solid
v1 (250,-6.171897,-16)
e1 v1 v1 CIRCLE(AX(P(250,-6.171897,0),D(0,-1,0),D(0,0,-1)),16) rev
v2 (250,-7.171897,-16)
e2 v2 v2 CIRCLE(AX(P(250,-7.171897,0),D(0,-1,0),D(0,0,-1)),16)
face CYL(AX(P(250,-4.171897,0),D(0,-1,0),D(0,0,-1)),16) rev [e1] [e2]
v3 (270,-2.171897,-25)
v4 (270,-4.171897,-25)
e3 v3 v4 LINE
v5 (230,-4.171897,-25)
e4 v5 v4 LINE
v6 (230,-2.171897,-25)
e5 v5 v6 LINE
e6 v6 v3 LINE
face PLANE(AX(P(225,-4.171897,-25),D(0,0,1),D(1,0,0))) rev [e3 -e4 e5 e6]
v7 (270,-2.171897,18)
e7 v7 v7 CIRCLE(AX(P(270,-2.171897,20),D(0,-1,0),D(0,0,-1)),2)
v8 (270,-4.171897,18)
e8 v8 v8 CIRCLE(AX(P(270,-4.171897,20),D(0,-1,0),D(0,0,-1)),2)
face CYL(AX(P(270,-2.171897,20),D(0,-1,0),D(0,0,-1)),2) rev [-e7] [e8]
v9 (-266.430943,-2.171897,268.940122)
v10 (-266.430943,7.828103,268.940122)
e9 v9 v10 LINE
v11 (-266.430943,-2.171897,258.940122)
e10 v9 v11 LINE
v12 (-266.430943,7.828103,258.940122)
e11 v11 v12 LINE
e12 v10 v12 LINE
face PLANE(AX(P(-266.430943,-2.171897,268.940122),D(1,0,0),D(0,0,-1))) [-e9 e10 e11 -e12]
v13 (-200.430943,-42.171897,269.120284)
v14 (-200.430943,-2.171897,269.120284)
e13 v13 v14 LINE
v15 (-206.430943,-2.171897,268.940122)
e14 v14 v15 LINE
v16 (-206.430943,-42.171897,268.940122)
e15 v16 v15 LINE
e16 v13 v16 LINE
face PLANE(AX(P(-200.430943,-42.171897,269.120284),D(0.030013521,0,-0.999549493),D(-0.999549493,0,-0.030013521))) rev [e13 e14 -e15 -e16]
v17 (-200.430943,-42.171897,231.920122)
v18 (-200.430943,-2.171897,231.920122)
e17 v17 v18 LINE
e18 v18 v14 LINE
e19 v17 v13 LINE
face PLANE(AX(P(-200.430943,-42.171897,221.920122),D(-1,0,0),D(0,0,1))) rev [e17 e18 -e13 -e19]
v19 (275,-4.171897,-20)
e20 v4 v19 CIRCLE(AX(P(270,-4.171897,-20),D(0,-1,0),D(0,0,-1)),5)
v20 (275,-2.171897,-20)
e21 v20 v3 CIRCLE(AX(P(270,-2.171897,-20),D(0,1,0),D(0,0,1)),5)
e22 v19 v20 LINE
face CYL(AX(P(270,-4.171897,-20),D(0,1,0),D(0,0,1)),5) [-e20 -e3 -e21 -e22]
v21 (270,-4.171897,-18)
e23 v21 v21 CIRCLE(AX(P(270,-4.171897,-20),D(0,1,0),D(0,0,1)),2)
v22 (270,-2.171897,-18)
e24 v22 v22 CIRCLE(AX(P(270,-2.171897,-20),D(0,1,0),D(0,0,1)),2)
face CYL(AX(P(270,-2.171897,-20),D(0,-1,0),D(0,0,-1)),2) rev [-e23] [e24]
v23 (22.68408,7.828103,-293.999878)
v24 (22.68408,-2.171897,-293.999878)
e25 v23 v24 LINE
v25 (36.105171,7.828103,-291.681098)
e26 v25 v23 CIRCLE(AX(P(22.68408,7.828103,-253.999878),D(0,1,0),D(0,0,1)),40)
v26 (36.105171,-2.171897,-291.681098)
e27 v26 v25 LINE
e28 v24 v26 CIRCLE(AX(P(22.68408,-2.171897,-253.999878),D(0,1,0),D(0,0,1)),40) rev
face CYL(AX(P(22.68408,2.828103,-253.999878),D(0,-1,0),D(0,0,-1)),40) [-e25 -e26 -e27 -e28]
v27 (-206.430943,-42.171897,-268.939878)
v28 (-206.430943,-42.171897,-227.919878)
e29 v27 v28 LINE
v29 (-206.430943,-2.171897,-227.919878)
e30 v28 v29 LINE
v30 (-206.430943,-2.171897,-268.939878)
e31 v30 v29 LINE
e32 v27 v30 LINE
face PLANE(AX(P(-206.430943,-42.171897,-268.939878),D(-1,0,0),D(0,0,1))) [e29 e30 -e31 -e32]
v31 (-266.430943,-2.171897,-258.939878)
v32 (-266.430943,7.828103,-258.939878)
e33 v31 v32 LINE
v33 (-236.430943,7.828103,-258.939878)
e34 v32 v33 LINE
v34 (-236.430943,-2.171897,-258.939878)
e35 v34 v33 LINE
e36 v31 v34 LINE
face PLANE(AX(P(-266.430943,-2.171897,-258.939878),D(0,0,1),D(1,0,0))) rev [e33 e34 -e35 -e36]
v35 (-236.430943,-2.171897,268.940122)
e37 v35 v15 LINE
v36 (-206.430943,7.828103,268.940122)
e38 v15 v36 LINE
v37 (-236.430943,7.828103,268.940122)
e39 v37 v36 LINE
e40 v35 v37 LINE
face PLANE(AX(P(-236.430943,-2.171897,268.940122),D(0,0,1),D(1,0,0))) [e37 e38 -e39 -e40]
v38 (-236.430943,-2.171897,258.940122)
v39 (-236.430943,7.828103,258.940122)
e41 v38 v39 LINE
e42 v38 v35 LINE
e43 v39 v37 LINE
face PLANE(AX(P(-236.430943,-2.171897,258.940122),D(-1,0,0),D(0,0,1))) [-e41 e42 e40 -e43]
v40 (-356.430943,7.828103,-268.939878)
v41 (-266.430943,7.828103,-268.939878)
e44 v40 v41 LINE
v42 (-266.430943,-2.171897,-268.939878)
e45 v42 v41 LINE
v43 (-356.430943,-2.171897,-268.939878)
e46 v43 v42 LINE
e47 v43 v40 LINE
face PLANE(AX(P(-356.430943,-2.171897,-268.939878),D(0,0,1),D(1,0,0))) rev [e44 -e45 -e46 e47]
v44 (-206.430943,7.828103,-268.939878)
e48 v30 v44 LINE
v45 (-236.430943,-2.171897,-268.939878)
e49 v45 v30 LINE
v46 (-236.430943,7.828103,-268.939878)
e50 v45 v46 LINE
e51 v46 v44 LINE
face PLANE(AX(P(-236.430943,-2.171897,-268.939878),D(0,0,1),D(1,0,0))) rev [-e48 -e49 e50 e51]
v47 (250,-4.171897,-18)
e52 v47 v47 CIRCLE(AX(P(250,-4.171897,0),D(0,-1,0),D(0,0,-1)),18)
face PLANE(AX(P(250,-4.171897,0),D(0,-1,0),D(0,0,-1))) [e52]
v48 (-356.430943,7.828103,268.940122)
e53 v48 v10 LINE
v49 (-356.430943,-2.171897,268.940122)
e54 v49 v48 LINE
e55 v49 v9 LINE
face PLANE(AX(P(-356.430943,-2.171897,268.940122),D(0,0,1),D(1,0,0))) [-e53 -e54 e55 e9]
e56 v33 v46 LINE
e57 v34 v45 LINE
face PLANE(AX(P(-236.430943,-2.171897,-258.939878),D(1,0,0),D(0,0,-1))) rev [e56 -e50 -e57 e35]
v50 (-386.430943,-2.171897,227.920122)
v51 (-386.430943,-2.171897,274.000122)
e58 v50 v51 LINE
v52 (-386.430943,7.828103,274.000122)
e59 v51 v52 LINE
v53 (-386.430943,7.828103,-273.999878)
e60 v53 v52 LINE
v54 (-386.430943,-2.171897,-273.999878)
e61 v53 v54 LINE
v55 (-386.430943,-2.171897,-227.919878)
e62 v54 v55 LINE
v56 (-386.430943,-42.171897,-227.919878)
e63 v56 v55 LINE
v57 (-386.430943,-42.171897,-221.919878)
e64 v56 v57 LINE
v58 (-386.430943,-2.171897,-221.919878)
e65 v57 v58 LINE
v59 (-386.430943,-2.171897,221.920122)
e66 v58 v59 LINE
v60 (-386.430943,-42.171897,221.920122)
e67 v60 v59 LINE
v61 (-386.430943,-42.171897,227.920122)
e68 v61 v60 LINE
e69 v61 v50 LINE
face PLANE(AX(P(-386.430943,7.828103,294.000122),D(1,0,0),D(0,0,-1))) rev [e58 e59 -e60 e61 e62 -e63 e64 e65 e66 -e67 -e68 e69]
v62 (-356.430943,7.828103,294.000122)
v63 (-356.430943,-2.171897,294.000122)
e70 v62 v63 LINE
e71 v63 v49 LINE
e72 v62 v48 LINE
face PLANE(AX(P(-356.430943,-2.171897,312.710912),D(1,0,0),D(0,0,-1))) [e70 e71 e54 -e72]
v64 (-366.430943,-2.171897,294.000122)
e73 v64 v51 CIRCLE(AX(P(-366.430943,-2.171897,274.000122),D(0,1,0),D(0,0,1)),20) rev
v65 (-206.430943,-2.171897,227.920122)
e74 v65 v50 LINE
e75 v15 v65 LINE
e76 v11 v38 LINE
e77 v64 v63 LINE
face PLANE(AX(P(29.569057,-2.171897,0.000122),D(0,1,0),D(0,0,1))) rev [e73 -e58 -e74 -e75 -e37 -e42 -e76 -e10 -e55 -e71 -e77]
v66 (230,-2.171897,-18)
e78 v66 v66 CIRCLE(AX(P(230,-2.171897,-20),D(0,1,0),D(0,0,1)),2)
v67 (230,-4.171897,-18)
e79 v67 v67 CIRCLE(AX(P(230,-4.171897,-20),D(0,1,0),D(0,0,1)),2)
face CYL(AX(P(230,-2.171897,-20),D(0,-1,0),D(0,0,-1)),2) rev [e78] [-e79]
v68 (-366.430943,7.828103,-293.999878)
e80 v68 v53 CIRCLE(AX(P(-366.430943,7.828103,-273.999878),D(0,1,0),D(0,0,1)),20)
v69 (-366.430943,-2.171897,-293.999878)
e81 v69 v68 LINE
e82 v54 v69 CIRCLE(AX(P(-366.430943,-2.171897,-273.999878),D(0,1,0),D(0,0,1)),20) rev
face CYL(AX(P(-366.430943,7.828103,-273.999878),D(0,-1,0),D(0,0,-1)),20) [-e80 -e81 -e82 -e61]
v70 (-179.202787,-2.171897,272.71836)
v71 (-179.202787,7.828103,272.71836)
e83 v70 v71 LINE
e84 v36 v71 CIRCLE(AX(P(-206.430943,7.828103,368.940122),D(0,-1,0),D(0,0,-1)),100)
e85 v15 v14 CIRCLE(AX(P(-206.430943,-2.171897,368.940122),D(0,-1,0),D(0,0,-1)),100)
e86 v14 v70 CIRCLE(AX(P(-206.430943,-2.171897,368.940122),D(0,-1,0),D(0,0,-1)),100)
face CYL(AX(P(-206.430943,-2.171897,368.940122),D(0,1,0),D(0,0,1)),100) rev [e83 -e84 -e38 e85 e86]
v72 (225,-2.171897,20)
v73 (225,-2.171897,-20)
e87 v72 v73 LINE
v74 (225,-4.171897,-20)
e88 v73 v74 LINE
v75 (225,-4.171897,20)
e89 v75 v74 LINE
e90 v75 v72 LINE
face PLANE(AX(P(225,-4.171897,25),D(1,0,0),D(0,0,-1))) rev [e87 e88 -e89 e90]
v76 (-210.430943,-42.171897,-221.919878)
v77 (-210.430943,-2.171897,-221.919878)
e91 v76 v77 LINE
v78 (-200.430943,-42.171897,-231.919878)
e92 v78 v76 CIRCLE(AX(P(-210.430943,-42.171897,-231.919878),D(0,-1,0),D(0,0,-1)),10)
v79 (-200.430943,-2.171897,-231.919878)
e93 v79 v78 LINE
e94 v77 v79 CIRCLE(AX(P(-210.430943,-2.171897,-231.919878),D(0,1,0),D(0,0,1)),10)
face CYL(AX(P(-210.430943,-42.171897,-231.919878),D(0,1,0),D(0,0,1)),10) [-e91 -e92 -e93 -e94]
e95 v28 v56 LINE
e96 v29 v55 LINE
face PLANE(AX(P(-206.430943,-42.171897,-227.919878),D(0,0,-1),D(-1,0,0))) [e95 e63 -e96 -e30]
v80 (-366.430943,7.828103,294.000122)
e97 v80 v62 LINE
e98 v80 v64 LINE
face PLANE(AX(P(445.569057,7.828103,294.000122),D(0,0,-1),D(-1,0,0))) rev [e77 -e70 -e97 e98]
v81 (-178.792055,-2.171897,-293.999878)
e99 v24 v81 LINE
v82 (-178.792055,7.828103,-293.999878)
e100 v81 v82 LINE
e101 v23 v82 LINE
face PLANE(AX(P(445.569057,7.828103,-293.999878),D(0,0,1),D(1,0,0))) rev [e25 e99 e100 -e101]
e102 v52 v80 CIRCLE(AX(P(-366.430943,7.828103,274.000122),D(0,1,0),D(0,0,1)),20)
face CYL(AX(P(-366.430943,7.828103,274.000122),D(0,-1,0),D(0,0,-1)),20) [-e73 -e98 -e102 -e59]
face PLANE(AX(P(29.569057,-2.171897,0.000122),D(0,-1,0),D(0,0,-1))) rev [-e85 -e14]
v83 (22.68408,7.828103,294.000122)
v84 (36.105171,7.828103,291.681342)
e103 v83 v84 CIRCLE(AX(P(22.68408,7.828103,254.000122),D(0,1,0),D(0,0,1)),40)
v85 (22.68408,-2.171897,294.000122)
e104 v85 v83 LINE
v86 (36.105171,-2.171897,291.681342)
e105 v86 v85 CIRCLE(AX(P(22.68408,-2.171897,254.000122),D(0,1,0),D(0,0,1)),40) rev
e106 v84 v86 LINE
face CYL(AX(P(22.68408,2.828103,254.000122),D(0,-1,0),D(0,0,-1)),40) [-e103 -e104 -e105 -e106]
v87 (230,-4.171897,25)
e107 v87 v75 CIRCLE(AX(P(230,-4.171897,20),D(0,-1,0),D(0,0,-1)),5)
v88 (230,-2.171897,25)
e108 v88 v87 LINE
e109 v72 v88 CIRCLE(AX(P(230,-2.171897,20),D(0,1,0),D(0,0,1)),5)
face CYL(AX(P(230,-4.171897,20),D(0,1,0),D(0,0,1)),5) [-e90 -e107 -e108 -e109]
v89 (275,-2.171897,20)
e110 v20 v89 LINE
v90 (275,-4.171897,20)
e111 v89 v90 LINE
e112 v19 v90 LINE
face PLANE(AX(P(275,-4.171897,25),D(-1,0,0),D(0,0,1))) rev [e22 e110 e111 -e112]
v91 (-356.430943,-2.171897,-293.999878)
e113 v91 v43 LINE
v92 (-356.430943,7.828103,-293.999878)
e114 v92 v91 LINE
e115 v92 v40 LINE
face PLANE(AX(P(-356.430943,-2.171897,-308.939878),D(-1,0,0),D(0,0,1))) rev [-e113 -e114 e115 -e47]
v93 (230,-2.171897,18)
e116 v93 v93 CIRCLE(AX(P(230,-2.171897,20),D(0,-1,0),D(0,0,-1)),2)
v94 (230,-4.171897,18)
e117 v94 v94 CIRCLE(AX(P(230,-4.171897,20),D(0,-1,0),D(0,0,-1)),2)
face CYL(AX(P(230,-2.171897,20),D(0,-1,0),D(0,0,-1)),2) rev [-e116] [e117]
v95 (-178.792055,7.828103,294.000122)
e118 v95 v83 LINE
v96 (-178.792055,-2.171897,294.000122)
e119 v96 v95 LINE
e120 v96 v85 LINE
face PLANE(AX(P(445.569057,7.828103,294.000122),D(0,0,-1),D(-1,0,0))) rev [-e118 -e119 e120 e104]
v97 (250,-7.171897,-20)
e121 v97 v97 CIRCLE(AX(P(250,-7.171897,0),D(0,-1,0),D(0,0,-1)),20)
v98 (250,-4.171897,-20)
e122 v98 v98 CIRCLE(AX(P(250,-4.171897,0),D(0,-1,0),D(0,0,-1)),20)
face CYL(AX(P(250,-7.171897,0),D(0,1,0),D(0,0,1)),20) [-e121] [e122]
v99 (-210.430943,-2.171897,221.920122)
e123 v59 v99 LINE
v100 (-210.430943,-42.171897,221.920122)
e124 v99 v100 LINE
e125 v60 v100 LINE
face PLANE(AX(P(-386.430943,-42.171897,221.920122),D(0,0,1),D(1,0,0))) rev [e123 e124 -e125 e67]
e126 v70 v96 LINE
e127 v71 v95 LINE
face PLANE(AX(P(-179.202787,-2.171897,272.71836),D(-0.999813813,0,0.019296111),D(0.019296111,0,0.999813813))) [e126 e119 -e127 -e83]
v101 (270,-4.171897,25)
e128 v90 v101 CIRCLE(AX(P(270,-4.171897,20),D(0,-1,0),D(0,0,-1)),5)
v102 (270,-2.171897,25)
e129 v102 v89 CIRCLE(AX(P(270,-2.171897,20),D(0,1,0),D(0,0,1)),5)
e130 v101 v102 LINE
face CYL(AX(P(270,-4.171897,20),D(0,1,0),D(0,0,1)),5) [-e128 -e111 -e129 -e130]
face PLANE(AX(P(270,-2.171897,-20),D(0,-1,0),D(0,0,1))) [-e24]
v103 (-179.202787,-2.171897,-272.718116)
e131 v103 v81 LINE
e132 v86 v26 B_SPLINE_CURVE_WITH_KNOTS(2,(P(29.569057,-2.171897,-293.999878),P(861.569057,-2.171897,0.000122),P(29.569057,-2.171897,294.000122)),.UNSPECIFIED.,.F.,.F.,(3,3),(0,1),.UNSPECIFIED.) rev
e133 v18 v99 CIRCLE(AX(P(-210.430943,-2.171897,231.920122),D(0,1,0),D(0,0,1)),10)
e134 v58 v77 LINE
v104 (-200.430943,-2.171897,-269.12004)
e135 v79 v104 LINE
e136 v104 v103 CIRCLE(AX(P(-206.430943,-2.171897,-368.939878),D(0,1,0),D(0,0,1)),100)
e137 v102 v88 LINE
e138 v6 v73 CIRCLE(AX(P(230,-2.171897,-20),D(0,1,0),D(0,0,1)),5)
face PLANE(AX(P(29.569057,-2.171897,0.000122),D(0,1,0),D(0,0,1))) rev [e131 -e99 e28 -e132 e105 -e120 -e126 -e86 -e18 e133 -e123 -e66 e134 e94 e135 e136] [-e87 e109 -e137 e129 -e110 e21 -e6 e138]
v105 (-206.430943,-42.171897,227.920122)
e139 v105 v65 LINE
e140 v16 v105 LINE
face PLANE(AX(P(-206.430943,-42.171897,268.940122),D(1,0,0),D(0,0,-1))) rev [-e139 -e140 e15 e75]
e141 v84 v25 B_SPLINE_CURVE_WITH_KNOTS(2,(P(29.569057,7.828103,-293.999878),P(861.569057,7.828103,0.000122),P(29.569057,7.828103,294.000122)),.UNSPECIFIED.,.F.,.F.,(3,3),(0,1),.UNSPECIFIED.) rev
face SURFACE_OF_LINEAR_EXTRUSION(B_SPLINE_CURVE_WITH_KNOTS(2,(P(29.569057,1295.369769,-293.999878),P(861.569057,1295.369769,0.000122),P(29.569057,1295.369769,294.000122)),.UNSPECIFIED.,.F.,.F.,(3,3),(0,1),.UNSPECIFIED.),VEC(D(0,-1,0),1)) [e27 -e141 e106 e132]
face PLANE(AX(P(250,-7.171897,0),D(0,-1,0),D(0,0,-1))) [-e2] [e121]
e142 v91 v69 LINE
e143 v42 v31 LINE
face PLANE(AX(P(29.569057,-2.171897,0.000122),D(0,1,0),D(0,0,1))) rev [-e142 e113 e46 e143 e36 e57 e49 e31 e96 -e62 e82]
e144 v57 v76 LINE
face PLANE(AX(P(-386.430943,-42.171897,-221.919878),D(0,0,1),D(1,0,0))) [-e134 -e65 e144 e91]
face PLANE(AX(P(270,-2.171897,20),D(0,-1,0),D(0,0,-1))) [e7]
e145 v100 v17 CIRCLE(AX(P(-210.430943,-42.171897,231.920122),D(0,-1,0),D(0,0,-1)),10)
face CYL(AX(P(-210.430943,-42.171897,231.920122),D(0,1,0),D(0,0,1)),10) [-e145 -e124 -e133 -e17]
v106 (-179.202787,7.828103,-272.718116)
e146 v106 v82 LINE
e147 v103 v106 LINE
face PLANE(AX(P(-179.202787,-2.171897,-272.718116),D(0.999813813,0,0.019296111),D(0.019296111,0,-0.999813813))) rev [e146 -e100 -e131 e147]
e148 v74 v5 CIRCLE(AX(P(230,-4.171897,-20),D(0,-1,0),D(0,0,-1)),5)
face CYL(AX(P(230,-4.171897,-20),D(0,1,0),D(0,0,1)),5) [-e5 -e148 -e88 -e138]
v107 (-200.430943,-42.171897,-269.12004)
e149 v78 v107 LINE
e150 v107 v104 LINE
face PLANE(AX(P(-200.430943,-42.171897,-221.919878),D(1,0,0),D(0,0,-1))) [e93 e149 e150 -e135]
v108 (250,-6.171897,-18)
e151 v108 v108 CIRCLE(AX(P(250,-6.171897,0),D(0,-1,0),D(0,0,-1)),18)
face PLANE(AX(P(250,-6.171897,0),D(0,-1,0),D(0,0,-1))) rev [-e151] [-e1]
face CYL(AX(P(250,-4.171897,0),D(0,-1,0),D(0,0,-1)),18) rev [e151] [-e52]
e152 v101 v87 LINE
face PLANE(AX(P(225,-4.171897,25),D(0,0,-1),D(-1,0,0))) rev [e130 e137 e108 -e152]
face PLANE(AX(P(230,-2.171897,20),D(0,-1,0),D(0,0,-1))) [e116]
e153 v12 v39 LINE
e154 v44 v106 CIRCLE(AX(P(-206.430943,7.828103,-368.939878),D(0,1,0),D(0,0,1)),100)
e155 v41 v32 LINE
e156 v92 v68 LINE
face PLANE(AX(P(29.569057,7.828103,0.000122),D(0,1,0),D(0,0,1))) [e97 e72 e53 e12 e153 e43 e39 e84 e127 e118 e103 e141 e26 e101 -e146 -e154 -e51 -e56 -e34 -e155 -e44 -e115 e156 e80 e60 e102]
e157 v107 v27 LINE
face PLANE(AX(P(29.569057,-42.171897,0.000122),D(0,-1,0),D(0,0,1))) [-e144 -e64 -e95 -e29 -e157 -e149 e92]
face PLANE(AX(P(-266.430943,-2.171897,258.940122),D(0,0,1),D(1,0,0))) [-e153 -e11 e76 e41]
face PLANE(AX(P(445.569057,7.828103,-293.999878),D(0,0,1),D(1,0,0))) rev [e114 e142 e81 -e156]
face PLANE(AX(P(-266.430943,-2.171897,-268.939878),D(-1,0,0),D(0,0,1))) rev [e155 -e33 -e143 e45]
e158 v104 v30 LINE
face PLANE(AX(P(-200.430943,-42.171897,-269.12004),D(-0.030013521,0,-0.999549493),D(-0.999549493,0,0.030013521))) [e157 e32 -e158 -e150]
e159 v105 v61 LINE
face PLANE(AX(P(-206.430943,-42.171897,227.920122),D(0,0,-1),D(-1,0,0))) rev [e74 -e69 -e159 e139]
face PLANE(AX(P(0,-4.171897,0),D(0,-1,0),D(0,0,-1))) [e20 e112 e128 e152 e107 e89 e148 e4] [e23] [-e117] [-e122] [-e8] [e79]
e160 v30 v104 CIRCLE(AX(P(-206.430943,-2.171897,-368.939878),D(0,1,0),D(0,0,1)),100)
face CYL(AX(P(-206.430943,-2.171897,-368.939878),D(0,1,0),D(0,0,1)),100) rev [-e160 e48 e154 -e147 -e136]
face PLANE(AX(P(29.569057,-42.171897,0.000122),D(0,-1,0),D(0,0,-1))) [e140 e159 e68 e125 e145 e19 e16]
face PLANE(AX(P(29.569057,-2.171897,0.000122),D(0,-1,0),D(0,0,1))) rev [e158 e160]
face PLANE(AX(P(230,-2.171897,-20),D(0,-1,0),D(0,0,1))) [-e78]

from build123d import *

# Parameters (mm, degrees)
CROQUIS1_W                 = 416
CROQUIS1_H                 = 294
SALIENTE_EXTRUIR1_DEPTH    = 5
CORTAR_EXTRUIR1_DEPTH      = 255.750858684
REDONDEO1_R                = 10
SALIENTE_EXTRUIR3_DEPTH    = 20
REDONDEO2_R                = 5
REDONDEO2_OF_SIMETR_A3_R   = 5
CORTAR_EXTRUIR5_DEPTH      = 256.925770488
CORTAR_EXTRUIR5_DEPTH_BACK = 256.925770488
REDONDEO4_R                = 20
ESCALA1_START              = -20
ESCALA1_DEPTH              = 17.828103166
ESCALA1_START_2            = -2.171896834
ESCALA1_2_DEPTH            = 10
ESCALA1_START_3            = -42.171896834
ESCALA1_3_DEPTH            = 40
CROQUIS9_W                 = 50
CROQUIS9_H                 = 50
SALIENTE_EXTRUIR4_DEPTH    = 2
REDONDEO5_R                = 5
CROQUIS10_R                = 2
CORTAR_EXTRUIR7_DEPTH      = 2
CROQUIS11_R                = 20
SALIENTE_EXTRUIR5_DEPTH    = 3
CROQUIS12_R                = 16
CORTAR_EXTRUIR8_DEPTH      = 3
CROQUIS13_R                = 20
SALIENTE_EXTRUIR6_DEPTH    = 2
CROQUIS14_R                = 18
CORTAR_EXTRUIR9_DEPTH      = 2


# Read off the part's stored shape, not the designer's step: Escala1
with BuildPart() as part:
    # Croquis1 → Saliente-Extruir1 (new body)
    with BuildSketch(Plane(origin=(0, 0, 0), x_dir=(1, 0, 0), z_dir=(0, 1, 0))):
        Rectangle(CROQUIS1_W, CROQUIS1_H)
    extrude(amount=SALIENTE_EXTRUIR1_DEPTH)

    # Croquis3 → Cortar-Extruir1 (cut, through all)
    with BuildSketch(Plane(origin=(0, 5, 0), x_dir=(1, 0, 0), z_dir=(0, 1, 0))):
        with BuildLine():
            Line((-193, 154.47), (-193, 134.47))
            Line((-193, 134.47), (-148, 134.47))
            Line((-148, 134.47), (-148, 129.47))
            Line((-148, 129.47), (-133, 129.47))
            Line((-133, 129.47), (-133, 134.47))
            Line((-133, 134.47), (-118, 134.47))
            ThreePointArc((-118, 134.47), (-111.127739024, 134.944531511), (-104.385922224, 136.359118837))
            Line((-104.385922224, 136.359118837), (-104, 156.355395091))
            Line((-104, 156.355395091), (-193, 156.355395091))
            Line((-193, 156.355395091), (-193, 154.47))
        make_face()
    cortar_extruir1 = extrude(amount=-CORTAR_EXTRUIR1_DEPTH, mode=Mode.SUBTRACT)

    # Simetría1: Cortar-Extruir1 across plane
    add(cortar_extruir1.mirror(Plane.XY), mode=Mode.SUBTRACT)

    # Redondeo1
    redondeo1_edges = [part.edges().sort_by_distance(p)[0] for p in [
        (-208, 2.5, -147),
        (208, 2.5, -147),
        (208, 2.5, 147),
        (-208, 2.5, 147),
    ]]
    fillet(redondeo1_edges, radius=REDONDEO1_R)

    # Croquis5 → Saliente-Extruir3 (add)
    with BuildSketch(Plane.XZ):
        Polygon((-208, 110.96), (-115, 110.96), (-115, 134.560081146), (-118, 134.47), (-118, 113.96), (-208, 113.96), align=None)
    saliente_extruir3 = extrude(amount=SALIENTE_EXTRUIR3_DEPTH)

    # Redondeo2
    redondeo2_edges = [part.edges().sort_by_distance(p)[0] for p in [
        (-115, -10, 110.96),
    ]]
    fillet(redondeo2_edges, radius=REDONDEO2_R)

    # Simetría3: Saliente-Extruir3 across plane
    add(saliente_extruir3.mirror(Plane.XY))

    # Redondeo2 of Simetría3
    redondeo2_of_simetr_a3_edges = [part.edges().sort_by_distance(p)[0] for p in [
        (-115, -10, -110.96),
    ]]
    fillet(redondeo2_of_simetr_a3_edges, radius=REDONDEO2_OF_SIMETR_A3_R)

    # Croquis7 → Cortar-Extruir5 (cut, two sides: drawn at the far end of the back side and taken through both)
    with BuildSketch(Plane(origin=(0, 5, 0), x_dir=(1, 0, 0), z_dir=(0, 1, 0)).offset(-CORTAR_EXTRUIR5_DEPTH_BACK)):
        with BuildLine():
            Line((198, 147), (0, 147))
            add(Edge.make_bspline(
                [(0, 147), (208, 73.5), (208, 0)],
                knots=[0, 0, 0, 0.5, 0.5, 0.5], degree=2))
            Line((208, 0), (208, 137))
            ThreePointArc((208, 137), (205.071067812, 144.071067812), (198, 147))
        make_face()
        with BuildLine():
            Line((208, -137), (208, 0))
            add(Edge.make_bspline(
                [(208, 0), (208, -73.5), (0, -147)],
                knots=[0.5, 0.5, 0.5, 1, 1, 1], degree=2))
            Line((0, -147), (198, -147))
            ThreePointArc((198, -147), (205.071067812, -144.071067812), (208, -137))
        make_face()
    extrude(amount=CORTAR_EXTRUIR5_DEPTH + CORTAR_EXTRUIR5_DEPTH_BACK, mode=Mode.SUBTRACT)

    # Redondeo4
    redondeo4_edges = [part.edges().sort_by_distance(p)[0] for p in [
        (0, 2.5, -147),
        (0, 2.5, 147),
    ]]
    fillet(redondeo4_edges, radius=REDONDEO4_R)

    # Escala1 outline → Escala1 (cut)
    with BuildSketch(Plane(origin=(0, 0, 0), x_dir=(1, 0, 0), z_dir=(0, 1, 0)).offset(ESCALA1_START)):
        with BuildLine():
            Line((-115, 115.96), (-115, 134.560081146))
            Line((-115, 134.560081146), (-118, 134.47))
            Line((-118, 134.47), (-118, 113.96))
            Line((-118, 113.96), (-208, 113.96))
            Line((-208, 113.96), (-208, 110.96))
            Line((-208, 110.96), (-120, 110.96))
            ThreePointArc((-120, 110.96), (-116.464466094, 112.424466094), (-115, 115.96))
        make_face()
        with BuildLine():
            Line((-118, -134.47), (-115, -134.560081146))
            Line((-115, -134.560081146), (-115, -115.96))
            ThreePointArc((-115, -115.96), (-116.464466094, -112.424466094), (-120, -110.96))
            Line((-120, -110.96), (-208, -110.96))
            Line((-208, -110.96), (-208, -113.96))
            Line((-208, -113.96), (-118, -113.96))
            Line((-118, -113.96), (-118, -134.47))
        make_face()
    extrude(amount=ESCALA1_DEPTH, mode=Mode.SUBTRACT)

    # Escala1 2 outline → Escala1 2 (add)
    with BuildSketch(Plane(origin=(0, 0, 0), x_dir=(1, 0, 0), z_dir=(0, 1, 0)).offset(ESCALA1_START_2)):
        with BuildLine():
            add(Edge.make_bspline(
                [(36.105170669, 291.681097591), (855.032944113, -0.000122107), (36.105170669, -291.681341805)],
                knots=[0.003943504, 0.003943504, 0.003943504, 0.996056496, 0.996056496, 0.996056496], degree=2))
            ThreePointArc((36.105170669, 291.681097591), (29.49404346, 293.415920236), (22.684079728, 293.999877893))
            Line((22.684079728, 293.999877893), (-178.792055331, 293.999877893))
            Line((-178.792055331, 293.999877893), (-179.202787056, 272.718115567))
            ThreePointArc((-179.202787056, 272.718115567), (-192.686420657, 269.888940914), (-206.430942609, 268.939877893))
            Line((-206.430942609, 268.939877893), (-236.430942609, 268.939877893))
            Line((-236.430942609, 268.939877893), (-236.430942609, 258.939877893))
            Line((-236.430942609, 258.939877893), (-266.430942609, 258.939877893))
            Line((-266.430942609, 258.939877893), (-266.430942609, 268.939877893))
            Line((-266.430942609, 268.939877893), (-356.430942609, 268.939877893))
            Line((-356.430942609, 268.939877893), (-356.430942609, 293.999877893))
            Line((-356.430942609, 293.999877893), (-366.430942609, 293.999877893))
            ThreePointArc((-366.430942609, 293.999877893), (-380.573078233, 288.142013517), (-386.430942609, 273.999877893))
            Line((-386.430942609, 273.999877893), (-386.430942609, -274.000122107))
            ThreePointArc((-386.430942609, -274.000122107), (-380.573078233, -288.142257731), (-366.430942609, -294.000122107))
            Line((-366.430942609, -294.000122107), (-356.430942609, -294.000122107))
            Line((-356.430942609, -294.000122107), (-356.430942609, -268.940122107))
            Line((-356.430942609, -268.940122107), (-266.430942609, -268.940122107))
            Line((-266.430942609, -268.940122107), (-266.430942609, -258.940122107))
            Line((-266.430942609, -258.940122107), (-236.430942609, -258.940122107))
            Line((-236.430942609, -258.940122107), (-236.430942609, -268.940122107))
            Line((-236.430942609, -268.940122107), (-206.430942609, -268.940122107))
            ThreePointArc((-206.430942609, -268.940122107), (-192.686420657, -269.889185129), (-179.202787056, -272.718359781))
            Line((-179.202787056, -272.718359781), (-178.792055331, -294.000122107))
            Line((-178.792055331, -294.000122107), (22.684079728, -294.000122107))
            ThreePointArc((22.684079728, -294.000122107), (29.49404346, -293.41616445), (36.105170669, -291.681341805))
        make_face()
    extrude(amount=ESCALA1_2_DEPTH)

    # Escala1 3 outline → Escala1 3 (add)
    with BuildSketch(Plane(origin=(0, 0, 0), x_dir=(1, 0, 0), z_dir=(0, 1, 0)).offset(ESCALA1_START_3)):
        with BuildLine():
            Line((-200.430942609, 231.919877893), (-200.430942609, 269.120040185))
            Line((-200.430942609, 269.120040185), (-206.430942609, 268.939877893))
            Line((-206.430942609, 268.939877893), (-206.430942609, 227.919877893))
            Line((-206.430942609, 227.919877893), (-386.430942609, 227.919877893))
            Line((-386.430942609, 227.919877893), (-386.430942609, 221.919877893))
            Line((-386.430942609, 221.919877893), (-210.430942609, 221.919877893))
            ThreePointArc((-210.430942609, 221.919877893), (-203.359874797, 224.848810081), (-200.430942609, 231.919877893))
        make_face()
        with BuildLine():
            Line((-206.430942609, -268.940122107), (-200.430942609, -269.120284399))
            Line((-200.430942609, -269.120284399), (-200.430942609, -231.920122107))
            ThreePointArc((-200.430942609, -231.920122107), (-203.359874797, -224.849054295), (-210.430942609, -221.920122107))
            Line((-210.430942609, -221.920122107), (-386.430942609, -221.920122107))
            Line((-386.430942609, -221.920122107), (-386.430942609, -227.920122107))
            Line((-386.430942609, -227.920122107), (-206.430942609, -227.920122107))
            Line((-206.430942609, -227.920122107), (-206.430942609, -268.940122107))
        make_face()
    extrude(amount=ESCALA1_3_DEPTH)

    # Croquis9 → Saliente-Extruir4 (add)
    with BuildSketch(Plane.XZ.offset(2.171896834)):
        with Locations((250, 0)):
            Rectangle(CROQUIS9_W, CROQUIS9_H)
    extrude(amount=SALIENTE_EXTRUIR4_DEPTH)

    # Redondeo5
    redondeo5_edges = [part.edges().sort_by_distance(p)[0] for p in [
        (275, -3.171896834, -25),
        (275, -3.171896834, 25),
        (225, -3.171896834, 25),
        (225, -3.171896834, -25),
    ]]
    fillet(redondeo5_edges, radius=REDONDEO5_R)

    # Croquis10 → Cortar-Extruir7 (cut)
    with BuildSketch(Plane.XZ.offset(4.171896834)):
        with Locations(Location((230, 20, 0), (0, 0, 270))):
            Circle(CROQUIS10_R)
        with Locations(Location((270, 20, 0), (0, 0, 270))):
            Circle(CROQUIS10_R)
    cortar_extruir7 = extrude(amount=-CORTAR_EXTRUIR7_DEPTH, mode=Mode.SUBTRACT)

    # Simetría7: Cortar-Extruir7 across plane
    add(cortar_extruir7.mirror(Plane.XY), mode=Mode.SUBTRACT)

    # Croquis11 → Saliente-Extruir5 (add)
    with BuildSketch(Plane.XZ.offset(4.171896834)):
        with Locations(Location((250, 0, 0), (0, 0, 270))):
            Circle(CROQUIS11_R)
    extrude(amount=SALIENTE_EXTRUIR5_DEPTH)

    # Croquis12 → Cortar-Extruir8 (cut)
    with BuildSketch(Plane.XZ.offset(7.171896834)):
        with Locations(Location((250, 0, 0), (0, 0, 270))):
            Circle(CROQUIS12_R)
    extrude(amount=-CORTAR_EXTRUIR8_DEPTH, mode=Mode.SUBTRACT)

    # Croquis13 → Saliente-Extruir6 (add)
    with BuildSketch(Plane.XZ.offset(4.171896834)):
        with Locations(Location((250, 0, 0), (0, 0, 270))):
            Circle(CROQUIS13_R)
    extrude(amount=SALIENTE_EXTRUIR6_DEPTH)

    # Croquis14 → Cortar-Extruir9 (cut)
    with BuildSketch(Plane.XZ.offset(6.171896834)):
        with Locations(Location((250, 0, 0), (0, 0, 270))):
            Circle(CROQUIS14_R)
    extrude(amount=-CORTAR_EXTRUIR9_DEPTH, mode=Mode.SUBTRACT)


solid = part.part
